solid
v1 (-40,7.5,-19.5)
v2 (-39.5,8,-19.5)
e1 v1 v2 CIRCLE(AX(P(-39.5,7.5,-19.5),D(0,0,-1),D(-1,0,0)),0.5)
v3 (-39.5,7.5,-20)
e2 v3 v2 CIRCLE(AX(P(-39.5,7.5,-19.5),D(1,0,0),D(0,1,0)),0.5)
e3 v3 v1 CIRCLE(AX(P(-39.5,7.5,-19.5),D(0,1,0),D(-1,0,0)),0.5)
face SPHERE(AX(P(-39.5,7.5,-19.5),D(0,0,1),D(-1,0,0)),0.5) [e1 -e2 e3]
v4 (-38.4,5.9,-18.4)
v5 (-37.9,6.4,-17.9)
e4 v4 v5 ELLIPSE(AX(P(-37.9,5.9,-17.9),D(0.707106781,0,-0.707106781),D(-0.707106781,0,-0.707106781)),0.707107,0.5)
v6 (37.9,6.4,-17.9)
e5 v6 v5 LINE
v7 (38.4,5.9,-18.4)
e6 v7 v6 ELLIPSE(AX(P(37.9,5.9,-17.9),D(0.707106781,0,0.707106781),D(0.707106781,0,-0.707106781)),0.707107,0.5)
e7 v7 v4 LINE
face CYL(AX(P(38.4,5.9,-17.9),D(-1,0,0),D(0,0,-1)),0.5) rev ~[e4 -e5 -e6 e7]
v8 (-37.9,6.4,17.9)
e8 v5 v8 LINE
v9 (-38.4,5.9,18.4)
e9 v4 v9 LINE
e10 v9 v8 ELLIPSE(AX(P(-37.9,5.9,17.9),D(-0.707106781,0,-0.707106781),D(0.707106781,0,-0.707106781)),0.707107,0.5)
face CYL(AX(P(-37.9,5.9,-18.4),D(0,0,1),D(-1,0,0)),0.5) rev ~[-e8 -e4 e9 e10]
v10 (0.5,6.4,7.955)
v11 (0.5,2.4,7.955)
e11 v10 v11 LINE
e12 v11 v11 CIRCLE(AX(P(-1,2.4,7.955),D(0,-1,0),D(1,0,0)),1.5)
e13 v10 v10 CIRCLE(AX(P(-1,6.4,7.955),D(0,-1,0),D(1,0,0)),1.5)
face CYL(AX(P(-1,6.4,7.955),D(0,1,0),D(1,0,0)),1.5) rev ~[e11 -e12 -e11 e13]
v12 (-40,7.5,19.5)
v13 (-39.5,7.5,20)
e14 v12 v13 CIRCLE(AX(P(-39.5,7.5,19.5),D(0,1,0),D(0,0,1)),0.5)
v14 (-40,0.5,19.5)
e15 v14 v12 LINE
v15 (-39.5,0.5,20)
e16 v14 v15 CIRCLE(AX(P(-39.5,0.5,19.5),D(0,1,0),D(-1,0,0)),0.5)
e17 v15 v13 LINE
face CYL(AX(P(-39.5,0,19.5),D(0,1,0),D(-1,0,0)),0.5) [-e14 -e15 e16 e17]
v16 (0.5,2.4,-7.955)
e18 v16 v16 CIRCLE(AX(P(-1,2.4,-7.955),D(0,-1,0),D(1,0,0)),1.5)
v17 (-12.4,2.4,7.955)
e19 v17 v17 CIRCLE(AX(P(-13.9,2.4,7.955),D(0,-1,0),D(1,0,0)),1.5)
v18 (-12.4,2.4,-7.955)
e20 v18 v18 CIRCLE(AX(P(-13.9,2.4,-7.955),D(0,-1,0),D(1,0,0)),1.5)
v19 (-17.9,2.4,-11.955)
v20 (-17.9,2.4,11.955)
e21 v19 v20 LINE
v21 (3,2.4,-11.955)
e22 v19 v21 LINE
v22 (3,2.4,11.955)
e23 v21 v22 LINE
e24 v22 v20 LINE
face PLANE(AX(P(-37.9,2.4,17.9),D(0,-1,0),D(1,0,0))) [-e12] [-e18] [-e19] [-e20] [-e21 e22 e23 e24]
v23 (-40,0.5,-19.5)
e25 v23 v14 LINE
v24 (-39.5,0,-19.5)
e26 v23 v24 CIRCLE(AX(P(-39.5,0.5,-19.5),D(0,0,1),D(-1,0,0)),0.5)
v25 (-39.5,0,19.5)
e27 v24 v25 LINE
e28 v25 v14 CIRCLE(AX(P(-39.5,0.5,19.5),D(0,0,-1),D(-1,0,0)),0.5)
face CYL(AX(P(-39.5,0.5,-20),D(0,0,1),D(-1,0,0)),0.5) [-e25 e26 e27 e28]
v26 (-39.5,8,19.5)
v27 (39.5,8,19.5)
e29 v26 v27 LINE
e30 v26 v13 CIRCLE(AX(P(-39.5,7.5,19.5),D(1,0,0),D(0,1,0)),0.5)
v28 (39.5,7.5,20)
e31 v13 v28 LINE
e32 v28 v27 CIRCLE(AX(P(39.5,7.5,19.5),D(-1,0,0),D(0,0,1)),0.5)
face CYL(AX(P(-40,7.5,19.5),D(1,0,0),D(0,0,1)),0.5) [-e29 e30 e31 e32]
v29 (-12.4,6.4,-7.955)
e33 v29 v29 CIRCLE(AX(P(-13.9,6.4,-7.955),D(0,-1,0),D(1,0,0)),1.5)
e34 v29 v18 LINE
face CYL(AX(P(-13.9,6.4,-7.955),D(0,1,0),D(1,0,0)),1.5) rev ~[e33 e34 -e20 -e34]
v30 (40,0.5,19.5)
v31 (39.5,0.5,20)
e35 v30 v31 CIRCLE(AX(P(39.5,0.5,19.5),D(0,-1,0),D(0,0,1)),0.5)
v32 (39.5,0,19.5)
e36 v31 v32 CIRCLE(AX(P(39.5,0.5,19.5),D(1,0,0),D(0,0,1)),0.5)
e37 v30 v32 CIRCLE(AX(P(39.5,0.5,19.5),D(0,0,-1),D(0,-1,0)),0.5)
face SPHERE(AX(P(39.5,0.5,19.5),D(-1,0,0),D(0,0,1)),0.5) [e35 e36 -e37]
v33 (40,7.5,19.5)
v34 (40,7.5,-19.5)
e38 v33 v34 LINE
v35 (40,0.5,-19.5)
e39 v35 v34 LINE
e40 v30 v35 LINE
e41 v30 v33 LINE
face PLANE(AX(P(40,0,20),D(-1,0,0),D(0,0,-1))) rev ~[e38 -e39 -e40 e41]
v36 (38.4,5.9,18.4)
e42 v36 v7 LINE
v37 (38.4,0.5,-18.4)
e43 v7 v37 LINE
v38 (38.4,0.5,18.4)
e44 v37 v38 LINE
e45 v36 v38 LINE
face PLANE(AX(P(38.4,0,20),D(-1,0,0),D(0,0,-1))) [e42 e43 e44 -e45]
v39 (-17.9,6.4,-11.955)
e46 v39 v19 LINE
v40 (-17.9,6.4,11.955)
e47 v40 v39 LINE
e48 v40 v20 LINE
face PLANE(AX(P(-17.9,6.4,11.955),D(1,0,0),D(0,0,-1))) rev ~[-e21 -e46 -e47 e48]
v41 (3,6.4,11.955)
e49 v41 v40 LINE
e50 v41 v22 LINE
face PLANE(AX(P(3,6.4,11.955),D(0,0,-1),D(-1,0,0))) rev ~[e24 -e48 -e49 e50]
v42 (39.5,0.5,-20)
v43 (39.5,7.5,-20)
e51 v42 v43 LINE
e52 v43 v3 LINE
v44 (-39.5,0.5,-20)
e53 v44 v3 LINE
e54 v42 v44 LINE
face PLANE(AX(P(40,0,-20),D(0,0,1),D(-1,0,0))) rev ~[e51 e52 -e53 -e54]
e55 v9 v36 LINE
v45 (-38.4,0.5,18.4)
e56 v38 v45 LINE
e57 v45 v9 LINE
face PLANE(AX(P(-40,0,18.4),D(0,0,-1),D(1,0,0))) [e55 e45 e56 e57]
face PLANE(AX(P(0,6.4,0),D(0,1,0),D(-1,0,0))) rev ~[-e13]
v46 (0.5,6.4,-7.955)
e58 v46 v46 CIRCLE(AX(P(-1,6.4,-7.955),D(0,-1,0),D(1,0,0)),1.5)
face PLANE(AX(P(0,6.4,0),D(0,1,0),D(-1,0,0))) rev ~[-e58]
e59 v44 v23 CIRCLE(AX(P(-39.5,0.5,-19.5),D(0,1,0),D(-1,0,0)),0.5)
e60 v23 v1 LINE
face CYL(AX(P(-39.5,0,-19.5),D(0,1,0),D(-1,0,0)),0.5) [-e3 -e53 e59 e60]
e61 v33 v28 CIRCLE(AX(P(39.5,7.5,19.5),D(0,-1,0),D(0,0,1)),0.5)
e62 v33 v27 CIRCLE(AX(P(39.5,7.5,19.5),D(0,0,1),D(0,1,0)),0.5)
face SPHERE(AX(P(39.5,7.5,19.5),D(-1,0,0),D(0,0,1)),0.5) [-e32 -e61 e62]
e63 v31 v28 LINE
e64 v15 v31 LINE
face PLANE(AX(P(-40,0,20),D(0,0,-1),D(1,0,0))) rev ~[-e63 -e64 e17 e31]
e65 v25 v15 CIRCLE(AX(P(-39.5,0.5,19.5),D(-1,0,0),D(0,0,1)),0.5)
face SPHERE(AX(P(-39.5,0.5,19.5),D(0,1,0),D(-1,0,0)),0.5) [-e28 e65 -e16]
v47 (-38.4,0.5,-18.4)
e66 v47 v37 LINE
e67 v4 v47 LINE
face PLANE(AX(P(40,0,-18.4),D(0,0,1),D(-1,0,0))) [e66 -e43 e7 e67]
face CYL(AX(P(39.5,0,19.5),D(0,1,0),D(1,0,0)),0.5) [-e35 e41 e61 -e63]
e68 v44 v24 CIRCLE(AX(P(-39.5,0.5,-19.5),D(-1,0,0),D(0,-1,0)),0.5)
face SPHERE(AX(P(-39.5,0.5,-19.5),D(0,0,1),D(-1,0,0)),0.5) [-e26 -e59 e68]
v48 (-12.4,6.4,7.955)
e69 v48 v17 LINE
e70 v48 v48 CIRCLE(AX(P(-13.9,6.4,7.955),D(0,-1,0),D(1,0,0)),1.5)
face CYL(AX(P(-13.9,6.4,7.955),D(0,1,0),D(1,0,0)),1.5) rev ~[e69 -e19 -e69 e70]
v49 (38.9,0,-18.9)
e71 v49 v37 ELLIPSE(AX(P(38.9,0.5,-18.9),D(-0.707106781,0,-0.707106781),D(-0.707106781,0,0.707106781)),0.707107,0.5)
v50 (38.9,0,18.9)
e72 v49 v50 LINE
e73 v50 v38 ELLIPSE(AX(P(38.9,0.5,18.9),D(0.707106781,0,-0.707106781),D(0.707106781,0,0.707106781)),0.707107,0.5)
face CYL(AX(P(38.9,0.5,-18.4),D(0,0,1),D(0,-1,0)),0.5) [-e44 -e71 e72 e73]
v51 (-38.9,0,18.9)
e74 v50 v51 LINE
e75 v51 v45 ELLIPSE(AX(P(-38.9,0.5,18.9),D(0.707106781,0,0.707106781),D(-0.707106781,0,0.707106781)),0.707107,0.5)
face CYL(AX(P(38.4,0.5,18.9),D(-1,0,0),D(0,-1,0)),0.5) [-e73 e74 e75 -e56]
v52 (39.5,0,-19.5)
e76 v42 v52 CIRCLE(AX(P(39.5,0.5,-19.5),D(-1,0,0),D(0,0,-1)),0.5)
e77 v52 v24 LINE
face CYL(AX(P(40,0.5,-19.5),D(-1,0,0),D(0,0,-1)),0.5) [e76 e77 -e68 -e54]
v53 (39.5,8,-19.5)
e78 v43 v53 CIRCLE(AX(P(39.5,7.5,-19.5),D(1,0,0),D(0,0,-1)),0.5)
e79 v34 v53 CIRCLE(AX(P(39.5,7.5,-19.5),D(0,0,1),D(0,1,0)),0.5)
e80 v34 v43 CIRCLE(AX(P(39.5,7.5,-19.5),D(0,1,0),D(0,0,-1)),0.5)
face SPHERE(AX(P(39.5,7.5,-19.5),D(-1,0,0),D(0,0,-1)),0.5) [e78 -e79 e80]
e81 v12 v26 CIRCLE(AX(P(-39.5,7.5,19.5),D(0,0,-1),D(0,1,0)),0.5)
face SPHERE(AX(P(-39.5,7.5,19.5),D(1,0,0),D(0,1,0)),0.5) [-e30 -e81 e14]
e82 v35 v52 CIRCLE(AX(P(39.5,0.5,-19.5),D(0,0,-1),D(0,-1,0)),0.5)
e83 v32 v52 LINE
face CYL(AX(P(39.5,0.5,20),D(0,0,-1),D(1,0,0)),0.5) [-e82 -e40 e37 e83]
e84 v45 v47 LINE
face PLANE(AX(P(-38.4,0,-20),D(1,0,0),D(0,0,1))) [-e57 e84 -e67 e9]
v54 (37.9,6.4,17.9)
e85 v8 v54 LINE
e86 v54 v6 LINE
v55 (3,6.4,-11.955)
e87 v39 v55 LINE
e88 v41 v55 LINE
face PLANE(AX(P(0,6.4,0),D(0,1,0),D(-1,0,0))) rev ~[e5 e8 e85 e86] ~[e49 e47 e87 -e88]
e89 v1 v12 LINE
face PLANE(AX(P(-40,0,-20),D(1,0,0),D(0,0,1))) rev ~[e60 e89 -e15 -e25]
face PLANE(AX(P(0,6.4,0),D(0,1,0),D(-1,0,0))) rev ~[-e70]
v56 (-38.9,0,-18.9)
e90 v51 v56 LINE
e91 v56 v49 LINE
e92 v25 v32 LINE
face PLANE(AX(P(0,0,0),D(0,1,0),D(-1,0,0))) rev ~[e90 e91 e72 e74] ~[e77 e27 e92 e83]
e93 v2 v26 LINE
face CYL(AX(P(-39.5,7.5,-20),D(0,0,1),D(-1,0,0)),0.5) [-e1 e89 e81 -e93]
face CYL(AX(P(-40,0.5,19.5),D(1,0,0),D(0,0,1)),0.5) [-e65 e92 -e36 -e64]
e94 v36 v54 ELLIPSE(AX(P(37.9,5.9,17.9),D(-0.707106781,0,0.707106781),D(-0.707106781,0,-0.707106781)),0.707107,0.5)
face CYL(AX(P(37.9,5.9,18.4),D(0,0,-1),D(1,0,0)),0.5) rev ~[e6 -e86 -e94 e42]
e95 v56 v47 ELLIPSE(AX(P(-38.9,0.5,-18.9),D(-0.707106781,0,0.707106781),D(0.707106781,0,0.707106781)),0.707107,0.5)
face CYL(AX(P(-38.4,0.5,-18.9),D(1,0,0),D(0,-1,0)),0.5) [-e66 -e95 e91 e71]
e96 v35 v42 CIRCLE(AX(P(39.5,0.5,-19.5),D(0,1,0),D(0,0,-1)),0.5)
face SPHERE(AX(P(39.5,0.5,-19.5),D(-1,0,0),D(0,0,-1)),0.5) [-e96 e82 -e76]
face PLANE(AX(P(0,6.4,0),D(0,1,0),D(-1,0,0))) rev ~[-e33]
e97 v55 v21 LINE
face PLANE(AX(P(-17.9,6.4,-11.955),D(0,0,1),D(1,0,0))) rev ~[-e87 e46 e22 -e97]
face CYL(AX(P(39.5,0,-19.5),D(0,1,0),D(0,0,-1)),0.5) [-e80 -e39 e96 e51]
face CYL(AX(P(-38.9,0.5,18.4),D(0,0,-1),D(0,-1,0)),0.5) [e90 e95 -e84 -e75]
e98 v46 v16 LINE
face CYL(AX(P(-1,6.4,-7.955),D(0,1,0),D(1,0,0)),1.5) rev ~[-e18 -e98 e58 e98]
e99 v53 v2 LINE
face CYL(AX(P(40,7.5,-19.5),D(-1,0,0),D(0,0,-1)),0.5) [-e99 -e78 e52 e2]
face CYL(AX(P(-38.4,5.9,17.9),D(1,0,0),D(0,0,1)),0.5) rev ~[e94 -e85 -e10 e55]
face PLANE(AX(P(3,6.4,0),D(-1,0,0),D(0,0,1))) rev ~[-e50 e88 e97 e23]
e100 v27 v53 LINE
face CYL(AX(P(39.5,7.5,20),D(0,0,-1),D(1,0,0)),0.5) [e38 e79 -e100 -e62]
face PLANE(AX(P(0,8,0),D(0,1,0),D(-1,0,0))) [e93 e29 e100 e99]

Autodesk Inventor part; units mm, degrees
ref_plane "YZ Plane" through (0, 0, 0) normal (1, 0, 0) x (0, 1, 0)
ref_plane "XZ Plane" through (0, 0, 0) normal (0, 1, 0) x (-1, 0, 0)
ref_plane "XY Plane" through (0, 0, 0) normal (0, 0, 1) x (1, 0, 0)
sketch "Sketch1" plane through (0, 0, 0) normal (0, 1, 0) x (-1, 0, 0)
  line L0 (40, 20) -> (-40, 20)
  line L1 (-40, 20) -> (-40, -20)
  line L2 (-40, -20) -> (40, -20)
  line L3 (40, -20) -> (40, 20)
  line L4 (40, 20) -> (-40, -20) construction
  line L5 (-40, 20) -> (40, -20) construction
  point P0 (0, 0)
  dimension "d0" = 80
  dimension "d1" = 40
extrude "Extrusion1" add sketch "Sketch1" along normal blind 8
shell "Shell1" thickness 1.6 removed faces 1 at (13.3333, 0, 6.6667)
fillet "Fillet1" radius 0.5 20 edges at (0, 8, 20) (-40, 8, 0) (-40, 4, 20) (-40, 0, 0) (0, 0, 20) (40, 4, 20) (-40, 4, -20) (0, 0, -20) (0, 8, -20) (40, 4, -20) (40, 8, 0) (38.4, 0, 0) (40, 0, 0) (0, 0, 18.4) (0, 0, -18.4) (-38.4, 0, 0) (38.4, 6.4, 0) (0, 6.4, -18.4) (0, 6.4, 18.4) (-38.4, 6.4, 0)
sketch "Sketch4" plane through (-37.9, 6.4, 17.9) normal (0, -1, 0) x (1, 0, 0)
  circle A0 centre (36.9, -25.855) radius 1.5
  circle A1 centre (24, -25.855) radius 1.5
  circle A2 centre (24, -9.945) radius 1.5
  circle A3 centre (36.9, -9.945) radius 1.5
  line L0 (0, -35.8) -> (0, 0) projected
  line L1 (0, -17.9) -> (71.9831, -17.9)
  line L2 (36.9, -9.945) -> (24, -25.855) construction
  line L3 (24, -9.945) -> (36.9, -25.855) construction
  line L4 (40.9, -5.945) -> (20, -5.945)
  line L5 (20, -5.945) -> (20, -29.855)
  line L6 (20, -29.855) -> (40.9, -29.855)
  line L7 (40.9, -29.855) -> (40.9, -5.945)
  line L8 (40.9, -5.945) -> (20, -29.855) construction
  line L9 (20, -5.945) -> (40.9, -29.855) construction
  point P0 (30.45, -17.9)
  dimension "d24" = 3
  dimension "d25" = 3
  dimension "d28" = 15.91
  dimension "d29" = 12.9
  dimension "d30" = 4
  dimension "d31" = 4
  dimension "d32" = 20
extrude "Extrusion4" add sketch "Sketch4" along normal blind 4
equation "\"d0\" = plate_depth"
equation "\"d1\" = plate_width"
equation "\"plate_width\" = 40"
equation "\"plate_depth\" = 80"
properties part number "plate"
